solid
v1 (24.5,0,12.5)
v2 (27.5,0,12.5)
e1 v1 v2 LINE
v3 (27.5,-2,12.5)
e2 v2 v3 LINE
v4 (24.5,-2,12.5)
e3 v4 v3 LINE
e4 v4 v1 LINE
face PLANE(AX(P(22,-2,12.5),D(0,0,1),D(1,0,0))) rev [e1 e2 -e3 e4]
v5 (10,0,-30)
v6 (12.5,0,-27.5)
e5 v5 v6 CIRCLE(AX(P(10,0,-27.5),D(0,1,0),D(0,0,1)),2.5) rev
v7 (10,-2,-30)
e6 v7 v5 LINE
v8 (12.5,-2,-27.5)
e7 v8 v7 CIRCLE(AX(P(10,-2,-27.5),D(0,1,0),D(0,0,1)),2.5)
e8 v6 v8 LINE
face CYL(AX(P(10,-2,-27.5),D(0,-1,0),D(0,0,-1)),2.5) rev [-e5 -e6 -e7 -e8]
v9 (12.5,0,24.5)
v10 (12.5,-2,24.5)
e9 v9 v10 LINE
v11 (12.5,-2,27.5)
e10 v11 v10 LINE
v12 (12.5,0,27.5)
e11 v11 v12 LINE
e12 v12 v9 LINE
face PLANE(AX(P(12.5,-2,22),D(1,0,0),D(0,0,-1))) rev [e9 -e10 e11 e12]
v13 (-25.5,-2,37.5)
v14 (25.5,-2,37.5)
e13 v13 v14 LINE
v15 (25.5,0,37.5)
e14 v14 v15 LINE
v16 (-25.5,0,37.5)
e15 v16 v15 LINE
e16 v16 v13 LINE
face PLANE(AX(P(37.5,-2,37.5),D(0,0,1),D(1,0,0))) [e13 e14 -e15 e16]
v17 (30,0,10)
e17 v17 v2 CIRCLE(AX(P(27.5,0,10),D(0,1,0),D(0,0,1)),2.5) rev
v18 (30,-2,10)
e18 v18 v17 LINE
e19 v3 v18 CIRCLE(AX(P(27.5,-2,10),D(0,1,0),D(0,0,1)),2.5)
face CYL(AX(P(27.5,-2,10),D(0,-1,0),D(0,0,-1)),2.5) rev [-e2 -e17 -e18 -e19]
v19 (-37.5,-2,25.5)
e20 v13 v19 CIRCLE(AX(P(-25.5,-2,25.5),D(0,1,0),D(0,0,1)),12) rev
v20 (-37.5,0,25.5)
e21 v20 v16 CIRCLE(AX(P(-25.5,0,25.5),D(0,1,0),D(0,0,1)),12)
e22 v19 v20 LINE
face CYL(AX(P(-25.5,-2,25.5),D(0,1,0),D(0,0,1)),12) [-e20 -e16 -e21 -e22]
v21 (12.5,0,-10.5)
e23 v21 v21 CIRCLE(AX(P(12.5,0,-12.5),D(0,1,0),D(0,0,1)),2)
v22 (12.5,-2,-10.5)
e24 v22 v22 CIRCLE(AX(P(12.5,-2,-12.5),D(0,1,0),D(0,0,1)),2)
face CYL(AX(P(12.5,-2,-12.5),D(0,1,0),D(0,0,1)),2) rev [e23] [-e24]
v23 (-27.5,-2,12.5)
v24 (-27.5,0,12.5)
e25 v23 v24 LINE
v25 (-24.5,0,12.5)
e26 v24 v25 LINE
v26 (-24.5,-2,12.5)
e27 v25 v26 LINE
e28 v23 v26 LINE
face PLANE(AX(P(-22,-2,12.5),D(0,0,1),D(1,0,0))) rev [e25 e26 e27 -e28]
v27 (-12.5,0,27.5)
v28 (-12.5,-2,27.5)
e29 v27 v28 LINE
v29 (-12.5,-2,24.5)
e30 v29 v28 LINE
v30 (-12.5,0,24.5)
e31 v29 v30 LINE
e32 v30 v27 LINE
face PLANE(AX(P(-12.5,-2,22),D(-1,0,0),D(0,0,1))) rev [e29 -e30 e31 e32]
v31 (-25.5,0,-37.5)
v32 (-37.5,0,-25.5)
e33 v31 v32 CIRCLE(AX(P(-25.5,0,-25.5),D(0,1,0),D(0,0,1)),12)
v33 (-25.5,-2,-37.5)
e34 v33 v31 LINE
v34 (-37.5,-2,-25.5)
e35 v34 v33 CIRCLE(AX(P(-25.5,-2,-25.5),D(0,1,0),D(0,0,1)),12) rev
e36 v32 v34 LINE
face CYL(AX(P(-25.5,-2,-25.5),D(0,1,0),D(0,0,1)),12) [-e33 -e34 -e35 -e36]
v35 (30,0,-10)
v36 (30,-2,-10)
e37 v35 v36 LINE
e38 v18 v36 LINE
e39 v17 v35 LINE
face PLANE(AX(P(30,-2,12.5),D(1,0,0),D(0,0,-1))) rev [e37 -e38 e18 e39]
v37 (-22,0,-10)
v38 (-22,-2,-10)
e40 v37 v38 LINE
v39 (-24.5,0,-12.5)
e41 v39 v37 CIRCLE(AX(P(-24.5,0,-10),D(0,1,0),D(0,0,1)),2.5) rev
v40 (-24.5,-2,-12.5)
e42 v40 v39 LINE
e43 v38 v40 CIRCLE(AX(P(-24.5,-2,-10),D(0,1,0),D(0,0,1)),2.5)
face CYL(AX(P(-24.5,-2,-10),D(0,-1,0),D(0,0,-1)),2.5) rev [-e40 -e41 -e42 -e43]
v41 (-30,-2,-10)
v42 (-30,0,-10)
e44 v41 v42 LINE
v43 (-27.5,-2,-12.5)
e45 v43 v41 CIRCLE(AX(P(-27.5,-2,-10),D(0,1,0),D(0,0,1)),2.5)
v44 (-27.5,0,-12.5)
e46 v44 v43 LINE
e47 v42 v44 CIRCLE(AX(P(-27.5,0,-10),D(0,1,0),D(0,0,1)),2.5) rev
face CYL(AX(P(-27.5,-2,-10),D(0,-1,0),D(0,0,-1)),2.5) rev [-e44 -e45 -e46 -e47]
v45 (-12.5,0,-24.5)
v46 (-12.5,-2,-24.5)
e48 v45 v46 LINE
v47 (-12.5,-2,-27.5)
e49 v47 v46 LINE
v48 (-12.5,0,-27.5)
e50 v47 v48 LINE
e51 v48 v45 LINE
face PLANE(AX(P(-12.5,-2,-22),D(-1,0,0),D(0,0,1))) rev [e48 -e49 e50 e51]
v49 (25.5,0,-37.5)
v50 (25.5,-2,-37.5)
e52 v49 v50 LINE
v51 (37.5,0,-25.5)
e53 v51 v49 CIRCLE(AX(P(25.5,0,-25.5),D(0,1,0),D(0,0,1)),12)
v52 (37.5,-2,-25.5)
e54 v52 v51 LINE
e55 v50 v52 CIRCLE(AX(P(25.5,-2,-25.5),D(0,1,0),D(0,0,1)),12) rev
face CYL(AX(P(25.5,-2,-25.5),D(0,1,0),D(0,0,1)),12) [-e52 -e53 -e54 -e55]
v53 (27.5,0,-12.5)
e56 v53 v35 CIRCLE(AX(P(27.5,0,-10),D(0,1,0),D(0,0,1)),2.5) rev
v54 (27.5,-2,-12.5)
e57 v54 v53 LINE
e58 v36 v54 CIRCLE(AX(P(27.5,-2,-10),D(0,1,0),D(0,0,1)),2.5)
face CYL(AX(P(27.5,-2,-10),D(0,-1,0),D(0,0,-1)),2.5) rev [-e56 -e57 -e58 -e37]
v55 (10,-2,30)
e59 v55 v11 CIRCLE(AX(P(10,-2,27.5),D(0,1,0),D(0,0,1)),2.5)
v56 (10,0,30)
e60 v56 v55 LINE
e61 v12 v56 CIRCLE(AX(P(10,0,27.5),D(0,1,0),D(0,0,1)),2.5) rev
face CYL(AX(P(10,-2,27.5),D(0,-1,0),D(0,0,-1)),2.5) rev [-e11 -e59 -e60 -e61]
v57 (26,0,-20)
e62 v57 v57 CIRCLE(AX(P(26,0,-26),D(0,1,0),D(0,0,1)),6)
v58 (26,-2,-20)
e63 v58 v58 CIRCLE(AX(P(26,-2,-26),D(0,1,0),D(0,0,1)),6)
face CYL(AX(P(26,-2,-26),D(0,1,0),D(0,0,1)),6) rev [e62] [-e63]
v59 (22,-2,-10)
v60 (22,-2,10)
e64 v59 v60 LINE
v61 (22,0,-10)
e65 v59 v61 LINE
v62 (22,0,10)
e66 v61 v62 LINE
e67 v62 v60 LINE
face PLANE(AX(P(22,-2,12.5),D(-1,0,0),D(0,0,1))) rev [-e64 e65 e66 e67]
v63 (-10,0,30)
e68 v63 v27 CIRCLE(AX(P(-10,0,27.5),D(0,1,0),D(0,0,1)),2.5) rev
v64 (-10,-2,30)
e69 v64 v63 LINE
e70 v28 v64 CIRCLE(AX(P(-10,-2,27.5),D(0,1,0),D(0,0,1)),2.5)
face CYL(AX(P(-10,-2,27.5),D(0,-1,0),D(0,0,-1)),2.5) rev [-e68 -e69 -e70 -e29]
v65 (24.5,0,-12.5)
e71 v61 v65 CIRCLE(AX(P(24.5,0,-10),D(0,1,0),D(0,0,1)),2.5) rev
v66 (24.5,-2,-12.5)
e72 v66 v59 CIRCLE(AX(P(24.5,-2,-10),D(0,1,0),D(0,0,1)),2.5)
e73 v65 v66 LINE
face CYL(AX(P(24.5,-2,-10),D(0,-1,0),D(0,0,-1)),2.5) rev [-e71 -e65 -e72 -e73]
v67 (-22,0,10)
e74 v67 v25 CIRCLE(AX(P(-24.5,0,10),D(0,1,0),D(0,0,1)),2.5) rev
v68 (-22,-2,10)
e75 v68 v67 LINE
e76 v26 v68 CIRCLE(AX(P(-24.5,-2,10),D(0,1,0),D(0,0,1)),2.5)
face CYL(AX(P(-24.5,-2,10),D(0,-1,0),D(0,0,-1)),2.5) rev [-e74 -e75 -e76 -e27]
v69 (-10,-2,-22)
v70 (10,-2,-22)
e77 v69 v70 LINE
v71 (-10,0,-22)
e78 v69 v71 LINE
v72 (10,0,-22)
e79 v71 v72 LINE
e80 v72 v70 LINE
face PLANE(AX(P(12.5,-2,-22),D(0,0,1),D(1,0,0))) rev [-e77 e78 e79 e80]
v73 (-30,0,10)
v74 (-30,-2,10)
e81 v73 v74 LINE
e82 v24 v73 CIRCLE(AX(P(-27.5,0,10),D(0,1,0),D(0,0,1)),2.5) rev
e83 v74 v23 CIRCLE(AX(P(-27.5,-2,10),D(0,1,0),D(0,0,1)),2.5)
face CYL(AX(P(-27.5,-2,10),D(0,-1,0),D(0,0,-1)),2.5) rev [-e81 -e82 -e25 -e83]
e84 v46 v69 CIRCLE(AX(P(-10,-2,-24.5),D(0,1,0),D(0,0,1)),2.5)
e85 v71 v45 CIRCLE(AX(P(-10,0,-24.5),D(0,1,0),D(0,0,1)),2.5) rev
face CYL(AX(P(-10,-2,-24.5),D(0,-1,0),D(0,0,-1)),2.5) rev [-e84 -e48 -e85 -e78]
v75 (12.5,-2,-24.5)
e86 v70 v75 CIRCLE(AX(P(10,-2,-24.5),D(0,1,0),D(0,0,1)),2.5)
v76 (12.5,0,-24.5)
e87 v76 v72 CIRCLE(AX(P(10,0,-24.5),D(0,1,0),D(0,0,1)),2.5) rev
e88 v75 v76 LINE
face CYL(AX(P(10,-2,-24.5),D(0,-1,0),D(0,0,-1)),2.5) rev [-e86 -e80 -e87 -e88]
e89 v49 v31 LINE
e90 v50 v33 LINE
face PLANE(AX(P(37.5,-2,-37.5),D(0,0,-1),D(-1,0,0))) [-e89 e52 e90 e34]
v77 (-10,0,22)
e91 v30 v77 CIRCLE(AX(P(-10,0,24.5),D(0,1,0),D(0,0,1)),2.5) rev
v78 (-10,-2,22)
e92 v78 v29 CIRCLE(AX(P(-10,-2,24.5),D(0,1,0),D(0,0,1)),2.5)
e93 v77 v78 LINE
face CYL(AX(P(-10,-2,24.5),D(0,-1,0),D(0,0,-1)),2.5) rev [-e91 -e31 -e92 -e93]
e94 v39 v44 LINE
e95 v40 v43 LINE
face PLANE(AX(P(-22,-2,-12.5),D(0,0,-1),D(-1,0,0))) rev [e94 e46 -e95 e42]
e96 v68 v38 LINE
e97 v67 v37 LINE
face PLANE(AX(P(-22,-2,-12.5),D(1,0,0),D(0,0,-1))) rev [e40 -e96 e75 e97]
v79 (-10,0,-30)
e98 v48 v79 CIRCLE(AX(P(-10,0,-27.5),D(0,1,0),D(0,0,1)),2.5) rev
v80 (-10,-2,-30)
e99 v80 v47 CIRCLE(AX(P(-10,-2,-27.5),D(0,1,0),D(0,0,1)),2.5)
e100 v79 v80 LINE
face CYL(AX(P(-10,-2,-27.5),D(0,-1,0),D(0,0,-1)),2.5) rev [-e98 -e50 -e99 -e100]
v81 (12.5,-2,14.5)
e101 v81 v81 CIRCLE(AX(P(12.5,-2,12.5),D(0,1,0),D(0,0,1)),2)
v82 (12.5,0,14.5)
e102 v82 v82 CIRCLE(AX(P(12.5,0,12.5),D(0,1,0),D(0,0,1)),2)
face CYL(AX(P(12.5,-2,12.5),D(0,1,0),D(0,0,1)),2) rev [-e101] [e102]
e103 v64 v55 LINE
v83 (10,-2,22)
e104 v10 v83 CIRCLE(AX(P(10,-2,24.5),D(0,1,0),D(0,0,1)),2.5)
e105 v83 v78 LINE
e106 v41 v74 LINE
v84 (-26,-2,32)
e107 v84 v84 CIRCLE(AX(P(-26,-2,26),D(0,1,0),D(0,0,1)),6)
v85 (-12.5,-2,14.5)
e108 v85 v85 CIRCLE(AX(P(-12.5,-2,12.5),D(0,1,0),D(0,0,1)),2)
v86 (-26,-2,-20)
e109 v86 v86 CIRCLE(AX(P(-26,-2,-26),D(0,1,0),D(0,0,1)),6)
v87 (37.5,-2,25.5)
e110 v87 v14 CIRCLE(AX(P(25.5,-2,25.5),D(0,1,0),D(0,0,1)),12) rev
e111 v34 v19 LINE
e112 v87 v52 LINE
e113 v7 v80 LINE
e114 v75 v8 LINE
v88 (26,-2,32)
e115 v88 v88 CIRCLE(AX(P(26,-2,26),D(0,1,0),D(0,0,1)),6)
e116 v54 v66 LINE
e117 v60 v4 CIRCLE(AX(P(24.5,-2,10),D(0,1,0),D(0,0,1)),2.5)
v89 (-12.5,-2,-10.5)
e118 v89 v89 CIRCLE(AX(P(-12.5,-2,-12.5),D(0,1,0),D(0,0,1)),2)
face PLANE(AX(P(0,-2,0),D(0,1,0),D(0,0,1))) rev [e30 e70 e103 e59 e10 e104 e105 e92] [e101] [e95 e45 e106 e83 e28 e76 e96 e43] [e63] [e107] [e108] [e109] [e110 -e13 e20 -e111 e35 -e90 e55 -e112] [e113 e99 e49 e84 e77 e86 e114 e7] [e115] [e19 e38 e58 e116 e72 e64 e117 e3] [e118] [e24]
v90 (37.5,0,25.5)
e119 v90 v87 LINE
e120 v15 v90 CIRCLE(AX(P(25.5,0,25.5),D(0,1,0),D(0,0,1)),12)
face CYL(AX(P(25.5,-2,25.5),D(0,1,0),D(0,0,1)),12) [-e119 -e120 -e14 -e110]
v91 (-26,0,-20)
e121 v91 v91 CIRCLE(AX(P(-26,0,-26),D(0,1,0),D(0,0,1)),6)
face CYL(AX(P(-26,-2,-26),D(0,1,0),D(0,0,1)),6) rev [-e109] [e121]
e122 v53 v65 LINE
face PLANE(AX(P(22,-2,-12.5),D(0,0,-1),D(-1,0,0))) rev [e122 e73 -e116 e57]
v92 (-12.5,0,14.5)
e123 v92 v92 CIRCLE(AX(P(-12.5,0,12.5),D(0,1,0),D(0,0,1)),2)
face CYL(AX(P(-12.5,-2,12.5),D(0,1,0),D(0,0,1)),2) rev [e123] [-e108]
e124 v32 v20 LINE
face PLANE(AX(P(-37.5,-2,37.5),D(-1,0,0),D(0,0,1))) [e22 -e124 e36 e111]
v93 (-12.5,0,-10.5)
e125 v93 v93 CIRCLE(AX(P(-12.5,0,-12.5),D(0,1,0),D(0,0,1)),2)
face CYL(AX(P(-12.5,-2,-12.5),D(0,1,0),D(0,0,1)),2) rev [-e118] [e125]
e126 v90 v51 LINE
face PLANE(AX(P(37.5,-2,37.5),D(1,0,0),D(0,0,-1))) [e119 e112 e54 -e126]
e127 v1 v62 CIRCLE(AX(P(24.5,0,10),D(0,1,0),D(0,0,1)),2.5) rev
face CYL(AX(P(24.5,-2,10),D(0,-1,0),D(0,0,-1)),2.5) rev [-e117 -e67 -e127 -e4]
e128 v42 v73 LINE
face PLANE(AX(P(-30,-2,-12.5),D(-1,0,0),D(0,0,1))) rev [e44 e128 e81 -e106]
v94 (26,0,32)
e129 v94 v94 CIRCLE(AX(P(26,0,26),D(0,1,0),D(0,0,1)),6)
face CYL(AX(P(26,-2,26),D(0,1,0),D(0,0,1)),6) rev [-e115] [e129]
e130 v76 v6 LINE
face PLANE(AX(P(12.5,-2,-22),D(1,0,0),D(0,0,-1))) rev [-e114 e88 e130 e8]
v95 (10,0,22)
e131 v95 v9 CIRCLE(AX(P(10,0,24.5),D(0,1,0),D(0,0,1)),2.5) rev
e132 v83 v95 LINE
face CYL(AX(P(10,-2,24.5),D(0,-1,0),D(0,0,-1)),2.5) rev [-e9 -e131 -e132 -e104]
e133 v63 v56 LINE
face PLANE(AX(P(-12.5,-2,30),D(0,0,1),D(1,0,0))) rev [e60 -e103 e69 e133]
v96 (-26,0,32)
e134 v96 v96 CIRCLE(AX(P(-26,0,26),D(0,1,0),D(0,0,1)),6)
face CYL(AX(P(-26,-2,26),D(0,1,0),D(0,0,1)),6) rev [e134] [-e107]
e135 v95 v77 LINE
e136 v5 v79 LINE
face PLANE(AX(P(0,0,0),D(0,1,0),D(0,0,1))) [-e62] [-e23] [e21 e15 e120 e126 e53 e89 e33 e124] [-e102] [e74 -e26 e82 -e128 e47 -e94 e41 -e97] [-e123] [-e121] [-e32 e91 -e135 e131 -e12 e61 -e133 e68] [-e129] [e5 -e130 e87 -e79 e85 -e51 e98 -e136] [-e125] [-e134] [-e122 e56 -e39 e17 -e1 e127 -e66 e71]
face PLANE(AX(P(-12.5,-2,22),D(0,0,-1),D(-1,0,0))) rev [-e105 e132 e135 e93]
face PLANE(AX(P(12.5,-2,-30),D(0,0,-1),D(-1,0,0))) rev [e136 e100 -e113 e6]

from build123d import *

# Parameters (mm, degrees)
SKETCH_1_W             = 75
SKETCH_1_H             = 75
SKETCH_1_R             = 6
SKETCH_1_R_2           = 2
SKETCH_1_W_2           = 8
SKETCH_1_H_2           = 25
SKETCH_1_W_3           = 25
SKETCH_1_H_3           = 8
SM_BASE_FLANGE_1_DEPTH = 2
FILLET_1_R             = 12
FILLET_2_R             = 2.5


# Sheet-metal steps are written as plain solids
with BuildPart() as part:
    # Sketch 1 → 基体-法兰1 (new body)
    with BuildSketch(Plane(origin=(0, 0, 0), x_dir=(1, 0, 0), z_dir=(0, 1, 0))):
        Rectangle(SKETCH_1_W, SKETCH_1_H)
        with Locations(Location((26, 26, 0), (0, 0, 270))):
            Circle(SKETCH_1_R, mode=Mode.SUBTRACT)
        with Locations(Location((26, -26, 0), (0, 0, 270))):
            Circle(SKETCH_1_R, mode=Mode.SUBTRACT)
        with Locations(Location((-26, -26, 0), (0, 0, 270))):
            Circle(SKETCH_1_R, mode=Mode.SUBTRACT)
        with Locations(Location((-26, 26, 0), (0, 0, 270))):
            Circle(SKETCH_1_R, mode=Mode.SUBTRACT)
        with Locations(Location((-12.5, 12.5, 0), (0, 0, 270))):
            Circle(SKETCH_1_R_2, mode=Mode.SUBTRACT)
        with Locations(Location((12.5, 12.5, 0), (0, 0, 270))):
            Circle(SKETCH_1_R_2, mode=Mode.SUBTRACT)
        with Locations(Location((12.5, -12.5, 0), (0, 0, 270))):
            Circle(SKETCH_1_R_2, mode=Mode.SUBTRACT)
        with Locations(Location((-12.5, -12.5, 0), (0, 0, 270))):
            Circle(SKETCH_1_R_2, mode=Mode.SUBTRACT)
        with Locations((26, 0)):
            Rectangle(SKETCH_1_W_2, SKETCH_1_H_2, mode=Mode.SUBTRACT)
        with Locations((0, 26)):
            Rectangle(SKETCH_1_W_3, SKETCH_1_H_3, mode=Mode.SUBTRACT)
        with Locations((0, -26)):
            Rectangle(SKETCH_1_W_3, SKETCH_1_H_3, mode=Mode.SUBTRACT)
        with Locations((-26, 0)):
            Rectangle(SKETCH_1_W_2, SKETCH_1_H_2, mode=Mode.SUBTRACT)
    extrude(amount=-SM_BASE_FLANGE_1_DEPTH)

    # 圆角1
    fillet_1_edges = [part.edges().sort_by_distance(p)[0] for p in [
        (-37.5, -1, -37.5),
        (37.5, -1, -37.5),
        (37.5, -1, 37.5),
        (-37.5, -1, 37.5),
    ]]
    fillet(fillet_1_edges, radius=FILLET_1_R)

    # 圆角2
    fillet_2_edges = [part.edges().sort_by_distance(p)[0] for p in [
        (-12.5, -1, -22),
        (-12.5, -1, -30),
        (12.5, -1, -30),
        (12.5, -1, -22),
        (30, -1, -12.5),
        (30, -1, 12.5),
        (22, -1, 12.5),
        (22, -1, -12.5),
        (12.5, -1, 30),
        (-12.5, -1, 30),
        (-12.5, -1, 22),
        (12.5, -1, 22),
        (-30, -1, 12.5),
        (-30, -1, -12.5),
        (-22, -1, -12.5),
        (-22, -1, 12.5),
    ]]
    fillet(fillet_2_edges, radius=FILLET_2_R)


solid = part.part
